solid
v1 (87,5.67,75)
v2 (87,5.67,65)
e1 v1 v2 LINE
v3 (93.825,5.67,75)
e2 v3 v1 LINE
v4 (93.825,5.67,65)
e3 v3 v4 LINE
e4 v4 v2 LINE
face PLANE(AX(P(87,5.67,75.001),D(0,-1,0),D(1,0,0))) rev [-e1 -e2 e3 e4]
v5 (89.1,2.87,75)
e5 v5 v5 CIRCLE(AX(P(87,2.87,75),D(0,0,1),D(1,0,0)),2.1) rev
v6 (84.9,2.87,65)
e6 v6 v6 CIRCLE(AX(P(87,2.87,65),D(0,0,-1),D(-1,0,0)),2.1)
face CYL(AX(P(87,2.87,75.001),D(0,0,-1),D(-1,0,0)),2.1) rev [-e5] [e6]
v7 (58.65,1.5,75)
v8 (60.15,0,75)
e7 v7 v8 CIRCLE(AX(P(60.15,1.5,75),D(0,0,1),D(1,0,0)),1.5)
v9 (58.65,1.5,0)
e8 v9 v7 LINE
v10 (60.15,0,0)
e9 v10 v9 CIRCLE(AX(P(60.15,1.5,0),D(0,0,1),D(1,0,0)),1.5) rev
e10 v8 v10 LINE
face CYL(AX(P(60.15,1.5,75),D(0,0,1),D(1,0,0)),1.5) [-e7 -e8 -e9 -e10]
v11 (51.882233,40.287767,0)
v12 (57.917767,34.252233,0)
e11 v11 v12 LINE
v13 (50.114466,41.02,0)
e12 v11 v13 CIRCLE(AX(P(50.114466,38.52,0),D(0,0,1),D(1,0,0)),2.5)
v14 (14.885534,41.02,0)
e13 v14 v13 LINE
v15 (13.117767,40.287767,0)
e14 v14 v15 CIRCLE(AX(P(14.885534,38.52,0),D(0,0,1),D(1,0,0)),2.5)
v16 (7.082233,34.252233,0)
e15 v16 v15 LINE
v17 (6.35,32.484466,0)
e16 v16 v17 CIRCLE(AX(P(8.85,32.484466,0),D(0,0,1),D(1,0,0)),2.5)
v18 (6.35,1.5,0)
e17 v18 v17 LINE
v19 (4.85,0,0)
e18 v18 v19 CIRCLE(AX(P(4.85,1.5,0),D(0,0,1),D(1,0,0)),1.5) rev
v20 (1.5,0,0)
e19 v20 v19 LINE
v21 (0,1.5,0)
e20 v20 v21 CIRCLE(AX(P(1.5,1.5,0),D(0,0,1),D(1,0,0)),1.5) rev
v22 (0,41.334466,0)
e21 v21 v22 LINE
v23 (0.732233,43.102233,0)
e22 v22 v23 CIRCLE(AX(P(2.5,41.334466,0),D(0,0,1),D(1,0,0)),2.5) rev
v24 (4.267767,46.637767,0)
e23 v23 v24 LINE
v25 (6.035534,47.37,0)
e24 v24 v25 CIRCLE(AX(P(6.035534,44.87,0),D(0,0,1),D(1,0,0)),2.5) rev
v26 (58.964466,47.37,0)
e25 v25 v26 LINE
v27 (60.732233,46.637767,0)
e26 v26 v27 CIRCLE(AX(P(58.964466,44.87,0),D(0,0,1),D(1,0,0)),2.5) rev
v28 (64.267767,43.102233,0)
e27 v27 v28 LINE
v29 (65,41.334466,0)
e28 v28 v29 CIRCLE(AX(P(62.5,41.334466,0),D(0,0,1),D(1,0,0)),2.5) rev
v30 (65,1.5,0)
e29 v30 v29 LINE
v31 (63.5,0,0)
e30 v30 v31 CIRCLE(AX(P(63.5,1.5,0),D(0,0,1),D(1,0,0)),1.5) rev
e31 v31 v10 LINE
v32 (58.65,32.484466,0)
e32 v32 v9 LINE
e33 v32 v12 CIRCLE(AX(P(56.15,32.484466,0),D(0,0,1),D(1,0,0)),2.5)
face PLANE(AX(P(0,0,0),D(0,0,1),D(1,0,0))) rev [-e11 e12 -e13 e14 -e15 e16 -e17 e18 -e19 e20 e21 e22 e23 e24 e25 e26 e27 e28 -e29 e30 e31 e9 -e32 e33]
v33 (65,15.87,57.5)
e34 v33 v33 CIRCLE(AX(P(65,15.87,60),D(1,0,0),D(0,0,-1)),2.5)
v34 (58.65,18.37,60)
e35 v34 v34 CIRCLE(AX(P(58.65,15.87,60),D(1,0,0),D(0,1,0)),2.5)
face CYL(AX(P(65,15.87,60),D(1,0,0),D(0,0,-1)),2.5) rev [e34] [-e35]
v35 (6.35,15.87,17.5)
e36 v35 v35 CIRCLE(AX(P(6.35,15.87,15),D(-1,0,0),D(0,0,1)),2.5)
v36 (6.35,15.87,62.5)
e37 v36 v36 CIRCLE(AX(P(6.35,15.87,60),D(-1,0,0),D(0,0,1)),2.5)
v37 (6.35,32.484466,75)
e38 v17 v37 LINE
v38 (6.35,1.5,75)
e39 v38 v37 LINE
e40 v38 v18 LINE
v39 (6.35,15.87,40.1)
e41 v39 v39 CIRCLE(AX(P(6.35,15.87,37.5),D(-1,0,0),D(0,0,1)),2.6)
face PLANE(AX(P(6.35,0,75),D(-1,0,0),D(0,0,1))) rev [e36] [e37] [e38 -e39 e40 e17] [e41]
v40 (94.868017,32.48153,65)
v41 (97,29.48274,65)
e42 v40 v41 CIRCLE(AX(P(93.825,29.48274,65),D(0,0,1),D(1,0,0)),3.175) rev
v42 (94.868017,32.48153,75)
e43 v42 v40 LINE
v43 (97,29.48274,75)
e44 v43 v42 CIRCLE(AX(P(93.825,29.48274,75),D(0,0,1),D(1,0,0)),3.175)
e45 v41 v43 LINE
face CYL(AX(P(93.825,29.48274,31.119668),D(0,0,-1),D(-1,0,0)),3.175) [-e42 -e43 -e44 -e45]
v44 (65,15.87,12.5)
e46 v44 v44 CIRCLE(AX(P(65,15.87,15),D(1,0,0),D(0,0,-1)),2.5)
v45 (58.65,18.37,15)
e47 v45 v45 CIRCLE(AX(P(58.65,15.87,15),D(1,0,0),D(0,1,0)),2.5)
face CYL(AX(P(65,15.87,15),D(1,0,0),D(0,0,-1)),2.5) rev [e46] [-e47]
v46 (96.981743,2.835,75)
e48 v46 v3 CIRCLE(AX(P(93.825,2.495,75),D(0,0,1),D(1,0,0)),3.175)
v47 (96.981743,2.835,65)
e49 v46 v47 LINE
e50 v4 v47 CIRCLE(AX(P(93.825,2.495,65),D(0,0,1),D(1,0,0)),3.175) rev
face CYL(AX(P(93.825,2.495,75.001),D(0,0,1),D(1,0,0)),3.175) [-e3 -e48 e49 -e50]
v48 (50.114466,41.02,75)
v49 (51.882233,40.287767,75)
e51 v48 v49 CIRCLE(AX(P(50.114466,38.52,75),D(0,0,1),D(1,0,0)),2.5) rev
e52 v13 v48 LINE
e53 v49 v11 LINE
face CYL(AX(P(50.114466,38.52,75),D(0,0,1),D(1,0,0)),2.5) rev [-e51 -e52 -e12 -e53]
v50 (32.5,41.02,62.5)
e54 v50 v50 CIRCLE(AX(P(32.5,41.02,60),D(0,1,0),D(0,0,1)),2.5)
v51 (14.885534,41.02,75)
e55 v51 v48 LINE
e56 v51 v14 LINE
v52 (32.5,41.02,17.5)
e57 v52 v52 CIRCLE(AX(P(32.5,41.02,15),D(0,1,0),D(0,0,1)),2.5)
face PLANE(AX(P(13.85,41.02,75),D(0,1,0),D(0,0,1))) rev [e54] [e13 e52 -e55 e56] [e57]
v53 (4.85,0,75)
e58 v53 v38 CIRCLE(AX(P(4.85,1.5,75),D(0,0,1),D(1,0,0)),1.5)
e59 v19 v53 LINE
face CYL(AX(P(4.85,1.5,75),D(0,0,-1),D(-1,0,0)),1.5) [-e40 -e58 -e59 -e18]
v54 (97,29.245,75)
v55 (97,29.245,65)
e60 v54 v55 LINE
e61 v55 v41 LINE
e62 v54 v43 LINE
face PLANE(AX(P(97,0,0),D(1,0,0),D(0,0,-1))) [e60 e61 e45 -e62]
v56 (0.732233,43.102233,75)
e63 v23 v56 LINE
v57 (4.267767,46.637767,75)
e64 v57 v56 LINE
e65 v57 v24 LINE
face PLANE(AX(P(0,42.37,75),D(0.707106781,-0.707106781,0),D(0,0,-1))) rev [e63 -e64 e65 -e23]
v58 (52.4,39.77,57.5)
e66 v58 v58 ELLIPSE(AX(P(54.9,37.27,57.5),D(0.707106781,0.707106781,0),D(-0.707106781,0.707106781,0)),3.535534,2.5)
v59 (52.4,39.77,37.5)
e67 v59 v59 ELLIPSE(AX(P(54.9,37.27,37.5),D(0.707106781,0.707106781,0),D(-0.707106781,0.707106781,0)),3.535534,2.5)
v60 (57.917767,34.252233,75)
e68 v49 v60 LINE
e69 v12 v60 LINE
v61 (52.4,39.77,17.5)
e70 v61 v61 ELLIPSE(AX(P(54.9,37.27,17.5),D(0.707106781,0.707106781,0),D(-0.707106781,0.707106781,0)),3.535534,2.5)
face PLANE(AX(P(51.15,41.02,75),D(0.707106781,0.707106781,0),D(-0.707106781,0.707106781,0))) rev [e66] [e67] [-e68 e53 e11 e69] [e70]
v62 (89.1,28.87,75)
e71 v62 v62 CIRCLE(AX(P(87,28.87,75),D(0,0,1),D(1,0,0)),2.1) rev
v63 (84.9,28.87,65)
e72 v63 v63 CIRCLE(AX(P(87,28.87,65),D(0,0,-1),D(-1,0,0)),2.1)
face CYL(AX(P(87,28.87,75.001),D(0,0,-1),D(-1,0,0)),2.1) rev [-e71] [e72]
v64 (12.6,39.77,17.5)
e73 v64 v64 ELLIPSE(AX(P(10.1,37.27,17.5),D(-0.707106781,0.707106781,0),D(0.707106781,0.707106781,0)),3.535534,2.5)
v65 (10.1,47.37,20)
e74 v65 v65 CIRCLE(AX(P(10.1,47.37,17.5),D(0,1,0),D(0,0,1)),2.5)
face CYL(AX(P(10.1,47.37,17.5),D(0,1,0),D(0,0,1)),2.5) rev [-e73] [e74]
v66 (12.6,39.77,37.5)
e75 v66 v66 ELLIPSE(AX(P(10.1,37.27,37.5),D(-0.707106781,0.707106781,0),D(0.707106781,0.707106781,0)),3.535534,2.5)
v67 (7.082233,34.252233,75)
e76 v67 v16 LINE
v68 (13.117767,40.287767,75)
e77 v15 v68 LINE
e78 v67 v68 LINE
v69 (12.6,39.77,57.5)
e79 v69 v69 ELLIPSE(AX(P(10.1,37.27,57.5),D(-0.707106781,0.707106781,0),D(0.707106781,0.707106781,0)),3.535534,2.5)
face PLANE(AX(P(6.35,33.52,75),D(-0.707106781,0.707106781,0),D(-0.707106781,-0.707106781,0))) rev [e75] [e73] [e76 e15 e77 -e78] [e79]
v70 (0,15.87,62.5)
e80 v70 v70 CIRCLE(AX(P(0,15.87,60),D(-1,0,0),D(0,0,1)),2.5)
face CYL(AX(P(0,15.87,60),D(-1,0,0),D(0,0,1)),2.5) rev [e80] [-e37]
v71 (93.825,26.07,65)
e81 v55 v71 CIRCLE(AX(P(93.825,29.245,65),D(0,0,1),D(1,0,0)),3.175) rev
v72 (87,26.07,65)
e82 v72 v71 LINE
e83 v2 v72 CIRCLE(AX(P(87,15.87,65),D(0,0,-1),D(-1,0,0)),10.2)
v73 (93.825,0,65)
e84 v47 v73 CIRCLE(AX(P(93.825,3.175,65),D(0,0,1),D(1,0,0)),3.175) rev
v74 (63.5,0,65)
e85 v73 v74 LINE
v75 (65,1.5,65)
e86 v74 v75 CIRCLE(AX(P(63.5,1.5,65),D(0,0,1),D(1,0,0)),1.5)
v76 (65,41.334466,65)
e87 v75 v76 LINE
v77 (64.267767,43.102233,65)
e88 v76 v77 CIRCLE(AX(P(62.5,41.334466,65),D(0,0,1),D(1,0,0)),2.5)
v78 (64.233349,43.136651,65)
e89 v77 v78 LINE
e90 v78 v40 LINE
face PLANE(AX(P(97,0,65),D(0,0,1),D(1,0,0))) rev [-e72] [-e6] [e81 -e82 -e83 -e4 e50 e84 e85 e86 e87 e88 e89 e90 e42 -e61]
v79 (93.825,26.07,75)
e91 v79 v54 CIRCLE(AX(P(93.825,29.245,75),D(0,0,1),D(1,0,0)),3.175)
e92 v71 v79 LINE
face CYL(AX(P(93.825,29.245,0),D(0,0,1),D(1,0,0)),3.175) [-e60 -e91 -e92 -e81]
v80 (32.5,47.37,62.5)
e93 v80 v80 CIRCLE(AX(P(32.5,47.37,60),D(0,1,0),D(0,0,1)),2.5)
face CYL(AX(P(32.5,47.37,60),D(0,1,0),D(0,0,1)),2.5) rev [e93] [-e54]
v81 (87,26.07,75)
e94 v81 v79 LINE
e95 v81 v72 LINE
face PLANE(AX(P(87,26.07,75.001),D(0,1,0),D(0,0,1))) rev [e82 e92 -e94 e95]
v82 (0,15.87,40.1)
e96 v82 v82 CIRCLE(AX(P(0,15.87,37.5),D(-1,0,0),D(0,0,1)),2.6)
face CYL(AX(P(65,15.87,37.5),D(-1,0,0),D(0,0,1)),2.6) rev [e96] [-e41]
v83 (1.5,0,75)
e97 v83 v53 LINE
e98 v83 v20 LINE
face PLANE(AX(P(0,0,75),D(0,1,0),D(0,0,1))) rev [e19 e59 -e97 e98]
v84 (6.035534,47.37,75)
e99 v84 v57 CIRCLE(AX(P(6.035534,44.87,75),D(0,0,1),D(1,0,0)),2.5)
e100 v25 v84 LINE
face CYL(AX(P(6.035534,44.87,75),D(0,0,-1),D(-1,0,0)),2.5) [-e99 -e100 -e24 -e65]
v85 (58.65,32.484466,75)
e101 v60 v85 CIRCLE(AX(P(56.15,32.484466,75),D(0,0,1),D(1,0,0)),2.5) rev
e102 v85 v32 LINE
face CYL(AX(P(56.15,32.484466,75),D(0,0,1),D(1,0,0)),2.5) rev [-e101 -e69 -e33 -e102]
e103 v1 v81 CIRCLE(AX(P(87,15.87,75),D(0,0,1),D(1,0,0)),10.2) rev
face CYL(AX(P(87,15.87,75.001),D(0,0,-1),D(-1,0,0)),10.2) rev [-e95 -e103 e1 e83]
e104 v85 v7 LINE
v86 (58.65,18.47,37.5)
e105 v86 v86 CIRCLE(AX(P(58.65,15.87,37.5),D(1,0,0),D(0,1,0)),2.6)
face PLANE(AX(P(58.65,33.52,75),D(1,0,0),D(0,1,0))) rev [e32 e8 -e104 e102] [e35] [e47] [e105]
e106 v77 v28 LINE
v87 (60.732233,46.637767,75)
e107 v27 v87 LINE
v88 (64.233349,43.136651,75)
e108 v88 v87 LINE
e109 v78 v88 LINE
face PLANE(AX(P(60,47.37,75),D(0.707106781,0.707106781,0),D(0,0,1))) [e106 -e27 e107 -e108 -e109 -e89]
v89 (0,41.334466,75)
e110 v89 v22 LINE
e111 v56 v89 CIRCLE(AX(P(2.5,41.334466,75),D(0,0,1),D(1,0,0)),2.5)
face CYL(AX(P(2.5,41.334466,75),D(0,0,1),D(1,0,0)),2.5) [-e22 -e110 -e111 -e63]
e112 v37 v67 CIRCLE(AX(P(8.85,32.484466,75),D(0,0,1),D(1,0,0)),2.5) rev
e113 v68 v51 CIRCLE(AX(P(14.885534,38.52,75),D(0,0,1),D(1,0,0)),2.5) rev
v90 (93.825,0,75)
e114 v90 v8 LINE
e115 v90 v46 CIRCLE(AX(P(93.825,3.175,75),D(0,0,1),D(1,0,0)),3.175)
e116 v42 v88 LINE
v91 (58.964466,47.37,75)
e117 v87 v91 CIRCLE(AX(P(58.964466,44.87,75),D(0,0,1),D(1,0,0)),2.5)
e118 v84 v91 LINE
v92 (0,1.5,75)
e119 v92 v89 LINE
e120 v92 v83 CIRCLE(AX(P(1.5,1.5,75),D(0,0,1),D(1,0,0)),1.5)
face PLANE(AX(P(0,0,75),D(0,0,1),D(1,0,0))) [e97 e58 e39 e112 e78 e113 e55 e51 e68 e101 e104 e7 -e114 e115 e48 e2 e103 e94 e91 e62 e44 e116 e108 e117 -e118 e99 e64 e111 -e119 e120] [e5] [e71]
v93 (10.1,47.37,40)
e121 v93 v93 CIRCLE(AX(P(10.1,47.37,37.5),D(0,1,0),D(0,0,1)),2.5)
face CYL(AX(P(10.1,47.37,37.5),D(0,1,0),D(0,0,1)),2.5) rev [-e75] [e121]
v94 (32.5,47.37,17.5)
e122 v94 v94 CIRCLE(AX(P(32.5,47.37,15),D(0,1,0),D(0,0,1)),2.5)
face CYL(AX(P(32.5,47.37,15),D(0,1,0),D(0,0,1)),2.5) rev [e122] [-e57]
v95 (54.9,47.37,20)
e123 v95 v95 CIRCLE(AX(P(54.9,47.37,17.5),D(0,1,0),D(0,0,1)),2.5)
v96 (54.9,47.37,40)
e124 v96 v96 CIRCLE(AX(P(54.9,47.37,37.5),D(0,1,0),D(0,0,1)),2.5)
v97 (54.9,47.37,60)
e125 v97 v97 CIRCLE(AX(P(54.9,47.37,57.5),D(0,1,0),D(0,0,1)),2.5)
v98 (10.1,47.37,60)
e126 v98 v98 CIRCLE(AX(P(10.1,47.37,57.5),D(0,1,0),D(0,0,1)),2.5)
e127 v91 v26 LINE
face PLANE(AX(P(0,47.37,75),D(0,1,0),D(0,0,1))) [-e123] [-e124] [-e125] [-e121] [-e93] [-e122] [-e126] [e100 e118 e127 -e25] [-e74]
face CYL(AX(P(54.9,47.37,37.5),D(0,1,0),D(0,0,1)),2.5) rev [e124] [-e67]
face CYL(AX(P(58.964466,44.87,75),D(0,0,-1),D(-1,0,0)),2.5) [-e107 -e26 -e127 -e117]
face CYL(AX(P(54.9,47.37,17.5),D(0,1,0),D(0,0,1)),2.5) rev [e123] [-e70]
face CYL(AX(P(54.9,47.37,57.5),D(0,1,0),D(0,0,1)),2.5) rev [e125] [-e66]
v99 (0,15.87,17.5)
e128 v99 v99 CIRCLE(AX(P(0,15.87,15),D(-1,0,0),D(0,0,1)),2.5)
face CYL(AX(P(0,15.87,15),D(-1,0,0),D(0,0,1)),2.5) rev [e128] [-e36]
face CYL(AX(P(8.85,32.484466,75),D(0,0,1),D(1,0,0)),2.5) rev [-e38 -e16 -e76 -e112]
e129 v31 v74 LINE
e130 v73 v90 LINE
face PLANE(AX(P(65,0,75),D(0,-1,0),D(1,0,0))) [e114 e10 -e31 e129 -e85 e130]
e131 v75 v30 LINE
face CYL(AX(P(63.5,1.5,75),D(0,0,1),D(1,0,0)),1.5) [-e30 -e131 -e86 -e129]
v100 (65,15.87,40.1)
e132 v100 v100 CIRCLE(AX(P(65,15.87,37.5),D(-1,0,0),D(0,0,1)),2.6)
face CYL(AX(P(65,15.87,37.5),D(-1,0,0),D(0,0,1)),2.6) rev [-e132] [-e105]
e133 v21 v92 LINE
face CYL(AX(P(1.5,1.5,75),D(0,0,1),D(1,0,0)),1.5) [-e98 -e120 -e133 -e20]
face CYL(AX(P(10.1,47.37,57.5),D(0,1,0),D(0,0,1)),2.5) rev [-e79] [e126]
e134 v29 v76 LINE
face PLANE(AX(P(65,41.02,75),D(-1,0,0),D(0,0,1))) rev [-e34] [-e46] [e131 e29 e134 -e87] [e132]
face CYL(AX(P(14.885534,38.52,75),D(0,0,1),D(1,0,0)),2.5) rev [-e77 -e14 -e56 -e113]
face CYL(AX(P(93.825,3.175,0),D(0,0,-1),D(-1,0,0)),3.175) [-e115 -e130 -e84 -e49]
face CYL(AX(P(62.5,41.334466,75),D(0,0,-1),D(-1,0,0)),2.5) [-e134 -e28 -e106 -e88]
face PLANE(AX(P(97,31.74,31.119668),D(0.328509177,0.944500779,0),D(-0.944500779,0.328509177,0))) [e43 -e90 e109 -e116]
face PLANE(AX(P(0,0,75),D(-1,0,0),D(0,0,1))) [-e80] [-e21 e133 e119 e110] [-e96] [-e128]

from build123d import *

# Parameters (mm, degrees)
BOSS_EXTRUDE1_DEPTH        = 75
M6X1_0_TAPPED_HOLE1_REACH  = 111.972
M6X1_0_TAPPED_HOLE1_BORE_R = 2.5
M6X1_0_TAPPED_HOLE2_D      = 5
SKETCH8_R                  = 2.6
CUT_EXTRUDE1_DEPTH         = 110.972346069
SKETCH9_W                  = 10
SKETCH9_H                  = 31.74
BOSS_EXTRUDE2_DEPTH        = 32
CUT_EXTRUDE2_REACH         = 128.008
SKETCH10_R                 = 2.1
BOSS_EXTRUDE3_DEPTH        = 10
M6X1_0_TAPPED_HOLE3_D      = 5
M6X1_0_TAPPED_HOLE3_DEPTH  = 13.851
FILLET1_R                  = 3.175
CHAMFER1_SIZE              = 5
FILLET2_R                  = 2.5
FILLET3_R                  = 1.5


with BuildPart() as part:
    # Sketch1 → Boss-Extrude1 (new body)
    with BuildSketch(Plane.XY):
        Polygon((6.35, 33.52), (13.85, 41.02), (51.15, 41.02), (58.65, 33.52), (58.65, 0), (65, 0), (65, 41.02), (65, 47.37), (0, 47.37), (0, 41.02), (0, 0), (6.35, 0), align=None)
    extrude(amount=BOSS_EXTRUDE1_DEPTH)

    # M6x1.0 Tapped Hole1 bore → M6x1.0 Tapped Hole1 (cut, up to next)
    with BuildSketch(Plane.ZY, mode=Mode.PRIVATE) as m6x1_0_tapped_hole1_sk1:
        with Locations((60, 15.87)):
            Circle(M6X1_0_TAPPED_HOLE1_BORE_R)
    m6x1_0_tapped_hole1_tool1 = extrude(m6x1_0_tapped_hole1_sk1.sketch, amount=-M6X1_0_TAPPED_HOLE1_REACH, mode=Mode.PRIVATE) & part.part
    # M6x1.0 Tapped Hole1 bore → M6x1.0 Tapped Hole1 (cut, up to next)
    with BuildSketch(Plane.ZY, mode=Mode.PRIVATE) as m6x1_0_tapped_hole1_sk2:
        with Locations((15, 15.87)):
            Circle(M6X1_0_TAPPED_HOLE1_BORE_R)
    m6x1_0_tapped_hole1_tool2 = extrude(m6x1_0_tapped_hole1_sk2.sketch, amount=-M6X1_0_TAPPED_HOLE1_REACH, mode=Mode.PRIVATE) & part.part
    m6x1_0_tapped_hole1_1 = m6x1_0_tapped_hole1_tool1.solids().sort_by_distance((0, 15.87, 60))[0]
    add(m6x1_0_tapped_hole1_1, mode=Mode.SUBTRACT)
    m6x1_0_tapped_hole1_2 = m6x1_0_tapped_hole1_tool2.solids().sort_by_distance((0, 15.87, 15))[0]
    add(m6x1_0_tapped_hole1_2, mode=Mode.SUBTRACT)
    m6x1_0_tapped_hole1 = m6x1_0_tapped_hole1_1 + m6x1_0_tapped_hole1_2  # M6x1.0 Tapped Hole1 as one shape, for the pattern or mirror that repeats it

    # Mirror1: M6x1.0 Tapped Hole1 across plane
    add(m6x1_0_tapped_hole1.mirror(Plane.ZY.offset(-32.5)), mode=Mode.SUBTRACT)

    # M6x1.0 Tapped Hole2 (through all)
    with Locations(Plane(origin=(0, 47.37, 0), x_dir=(1, 0, 0), z_dir=(0, 1, 0))):
        with Locations((32.5, -15), (32.5, -60)):
            Hole(M6X1_0_TAPPED_HOLE2_D / 2)

    # Sketch8 → Cut-Extrude1 (cut, through all)
    with BuildSketch(Plane.ZY):
        with Locations((37.5, 15.87)):
            Circle(SKETCH8_R)
    extrude(amount=-CUT_EXTRUDE1_DEPTH, mode=Mode.SUBTRACT)

    # Sketch9 → Boss-Extrude2 (add)
    with BuildSketch(Plane(origin=(65, 0, 0), x_dir=(0, 0, -1), z_dir=(1, 0, 0))):
        with Locations((-70, 15.87)):
            Rectangle(SKETCH9_W, SKETCH9_H)
    extrude(amount=BOSS_EXTRUDE2_DEPTH)

    # Sketch10 → Cut-Extrude2 (cut, up to next)
    with BuildSketch(Plane(origin=(0, 0, 65), x_dir=(-1, 0, 0), z_dir=(0, 0, -1)), mode=Mode.PRIVATE) as cut_extrude2_sk1:
        with Locations((-87, 28.87)):
            Circle(SKETCH10_R)
    cut_extrude2_tool1 = extrude(cut_extrude2_sk1.sketch, amount=-CUT_EXTRUDE2_REACH, mode=Mode.PRIVATE) & part.part
    # Sketch10 → Cut-Extrude2 (cut, up to next)
    with BuildSketch(Plane(origin=(0, 0, 65), x_dir=(-1, 0, 0), z_dir=(0, 0, -1)), mode=Mode.PRIVATE) as cut_extrude2_sk2:
        with Locations((-87, 2.87)):
            Circle(SKETCH10_R)
    cut_extrude2_tool2 = extrude(cut_extrude2_sk2.sketch, amount=-CUT_EXTRUDE2_REACH, mode=Mode.PRIVATE) & part.part
    # Sketch10 → Cut-Extrude2 (cut, up to next)
    with BuildSketch(Plane(origin=(0, 0, 65), x_dir=(-1, 0, 0), z_dir=(0, 0, -1)), mode=Mode.PRIVATE) as cut_extrude2_sk3:
        with BuildLine():
            Line((-87, 26.07), (-97, 26.07))
            Line((-97, 26.07), (-97, 5.67))
            Line((-97, 5.67), (-87, 5.67))
            ThreePointArc((-87, 5.67), (-76.8, 15.87), (-87, 26.07))
        make_face()
    cut_extrude2_tool3 = extrude(cut_extrude2_sk3.sketch, amount=-CUT_EXTRUDE2_REACH, mode=Mode.PRIVATE) & part.part
    add(cut_extrude2_tool1.solids().sort_by_distance((87, 28.87, 65))[0], mode=Mode.SUBTRACT)
    add(cut_extrude2_tool2.solids().sort_by_distance((87, 2.87, 65))[0], mode=Mode.SUBTRACT)
    add(cut_extrude2_tool3.solids().sort_by_distance((87.850588, 15.87, 65))[0], mode=Mode.SUBTRACT)

    # Sketch11 → Boss-Extrude3 (add)
    with BuildSketch(Plane.XY.offset(75)):
        Polygon((97, 31.74), (65, 42.87), (65, 31.74), align=None)
    extrude(amount=-BOSS_EXTRUDE3_DEPTH)

    # M6x1.0 Tapped Hole3
    with Locations(Plane(origin=(0, 47.37, 0), x_dir=(1, 0, 0), z_dir=(0, 1, 0))):
        with Locations((54.9, -57.5), (54.9, -37.5), (54.9, -17.5)):
            m6x1_0_tapped_hole3 = Hole(M6X1_0_TAPPED_HOLE3_D / 2, depth=M6X1_0_TAPPED_HOLE3_DEPTH)

    # Mirror2: M6x1.0 Tapped Hole3 across plane
    add(m6x1_0_tapped_hole3.mirror(Plane.ZY.offset(-32.5)), mode=Mode.SUBTRACT)

    # Fillet1
    # the kernel refuses this fillet: 3.175 mm, written as the material it takes off along each edge
    with BuildSketch(Plane(origin=(97, 5.67, 57.0625), x_dir=(0, -1, 0), z_dir=(0, 0, 1)), Plane(origin=(97, 26.07, 57.0625), x_dir=(-1, 0, 0), z_dir=(0, 0, 1))) as fillet1_piece_1:
        with BuildLine():
            CenterArc((FILLET1_R, -FILLET1_R), FILLET1_R, 90, 90)
            Line((0, -FILLET1_R), (0, 0))
            Line((0, 0), (FILLET1_R, 0))
        make_face()
    extrude(amount=25.875, mode=Mode.SUBTRACT)
    with BuildSketch(Plane(origin=(97, 31.74, 59.356851229), x_dir=(0, -1, 0), z_dir=(0, 0, 1))) as fillet1_piece_2:
        with BuildLine():
            CenterArc((FILLET1_R * 0.710947876646, -FILLET1_R), FILLET1_R, 90, 70.821686435)
            Line((-FILLET1_R * 0.233552901866, -FILLET1_R * 0.671490822974), (0, 0))
            Line((0, 0), (FILLET1_R * 0.710947876646, 0))
        make_face()
    extrude(amount=21.286297542, mode=Mode.SUBTRACT)
    with BuildSketch(Plane(origin=(97, 0, 82.9375), x_dir=(-1, 0, 0), z_dir=(0, 0, -1))) as fillet1_piece_3:
        with BuildLine():
            CenterArc((FILLET1_R, FILLET1_R), FILLET1_R, 180, 90)
            Line((0, FILLET1_R), (0, 0))
            Line((0, 0), (FILLET1_R, 0))
        make_face()
    extrude(amount=25.875, mode=Mode.SUBTRACT)

    # Chamfer1
    chamfer1_edges = [part.edges().sort_by_distance(p)[0] for p in [
        (0, 47.37, 37.5),
        (65, 47.37, 37.5),
    ]]
    chamfer(chamfer1_edges, length=CHAMFER1_SIZE)

    # Fillet2
    fillet2_edges = [part.edges().sort_by_distance(p)[0] for p in [
        (0, 42.37, 37.5),
        (60, 47.37, 37.5),
        (5, 47.37, 37.5),
        (65, 42.37, 32.5),
        (58.65, 33.52, 37.5),
        (51.15, 41.02, 37.5),
        (13.85, 41.02, 37.5),
        (6.35, 33.52, 37.5),
    ]]
    fillet(fillet2_edges, radius=FILLET2_R)

    # Fillet3
    fillet3_edges = [part.edges().sort_by_distance(p)[0] for p in [
        (0, 0, 37.5),
        (58.65, 0, 37.5),
        (6.35, 0, 37.5),
        (65, 0, 32.5),
    ]]
    fillet(fillet3_edges, radius=FILLET3_R)


solid = part.part
